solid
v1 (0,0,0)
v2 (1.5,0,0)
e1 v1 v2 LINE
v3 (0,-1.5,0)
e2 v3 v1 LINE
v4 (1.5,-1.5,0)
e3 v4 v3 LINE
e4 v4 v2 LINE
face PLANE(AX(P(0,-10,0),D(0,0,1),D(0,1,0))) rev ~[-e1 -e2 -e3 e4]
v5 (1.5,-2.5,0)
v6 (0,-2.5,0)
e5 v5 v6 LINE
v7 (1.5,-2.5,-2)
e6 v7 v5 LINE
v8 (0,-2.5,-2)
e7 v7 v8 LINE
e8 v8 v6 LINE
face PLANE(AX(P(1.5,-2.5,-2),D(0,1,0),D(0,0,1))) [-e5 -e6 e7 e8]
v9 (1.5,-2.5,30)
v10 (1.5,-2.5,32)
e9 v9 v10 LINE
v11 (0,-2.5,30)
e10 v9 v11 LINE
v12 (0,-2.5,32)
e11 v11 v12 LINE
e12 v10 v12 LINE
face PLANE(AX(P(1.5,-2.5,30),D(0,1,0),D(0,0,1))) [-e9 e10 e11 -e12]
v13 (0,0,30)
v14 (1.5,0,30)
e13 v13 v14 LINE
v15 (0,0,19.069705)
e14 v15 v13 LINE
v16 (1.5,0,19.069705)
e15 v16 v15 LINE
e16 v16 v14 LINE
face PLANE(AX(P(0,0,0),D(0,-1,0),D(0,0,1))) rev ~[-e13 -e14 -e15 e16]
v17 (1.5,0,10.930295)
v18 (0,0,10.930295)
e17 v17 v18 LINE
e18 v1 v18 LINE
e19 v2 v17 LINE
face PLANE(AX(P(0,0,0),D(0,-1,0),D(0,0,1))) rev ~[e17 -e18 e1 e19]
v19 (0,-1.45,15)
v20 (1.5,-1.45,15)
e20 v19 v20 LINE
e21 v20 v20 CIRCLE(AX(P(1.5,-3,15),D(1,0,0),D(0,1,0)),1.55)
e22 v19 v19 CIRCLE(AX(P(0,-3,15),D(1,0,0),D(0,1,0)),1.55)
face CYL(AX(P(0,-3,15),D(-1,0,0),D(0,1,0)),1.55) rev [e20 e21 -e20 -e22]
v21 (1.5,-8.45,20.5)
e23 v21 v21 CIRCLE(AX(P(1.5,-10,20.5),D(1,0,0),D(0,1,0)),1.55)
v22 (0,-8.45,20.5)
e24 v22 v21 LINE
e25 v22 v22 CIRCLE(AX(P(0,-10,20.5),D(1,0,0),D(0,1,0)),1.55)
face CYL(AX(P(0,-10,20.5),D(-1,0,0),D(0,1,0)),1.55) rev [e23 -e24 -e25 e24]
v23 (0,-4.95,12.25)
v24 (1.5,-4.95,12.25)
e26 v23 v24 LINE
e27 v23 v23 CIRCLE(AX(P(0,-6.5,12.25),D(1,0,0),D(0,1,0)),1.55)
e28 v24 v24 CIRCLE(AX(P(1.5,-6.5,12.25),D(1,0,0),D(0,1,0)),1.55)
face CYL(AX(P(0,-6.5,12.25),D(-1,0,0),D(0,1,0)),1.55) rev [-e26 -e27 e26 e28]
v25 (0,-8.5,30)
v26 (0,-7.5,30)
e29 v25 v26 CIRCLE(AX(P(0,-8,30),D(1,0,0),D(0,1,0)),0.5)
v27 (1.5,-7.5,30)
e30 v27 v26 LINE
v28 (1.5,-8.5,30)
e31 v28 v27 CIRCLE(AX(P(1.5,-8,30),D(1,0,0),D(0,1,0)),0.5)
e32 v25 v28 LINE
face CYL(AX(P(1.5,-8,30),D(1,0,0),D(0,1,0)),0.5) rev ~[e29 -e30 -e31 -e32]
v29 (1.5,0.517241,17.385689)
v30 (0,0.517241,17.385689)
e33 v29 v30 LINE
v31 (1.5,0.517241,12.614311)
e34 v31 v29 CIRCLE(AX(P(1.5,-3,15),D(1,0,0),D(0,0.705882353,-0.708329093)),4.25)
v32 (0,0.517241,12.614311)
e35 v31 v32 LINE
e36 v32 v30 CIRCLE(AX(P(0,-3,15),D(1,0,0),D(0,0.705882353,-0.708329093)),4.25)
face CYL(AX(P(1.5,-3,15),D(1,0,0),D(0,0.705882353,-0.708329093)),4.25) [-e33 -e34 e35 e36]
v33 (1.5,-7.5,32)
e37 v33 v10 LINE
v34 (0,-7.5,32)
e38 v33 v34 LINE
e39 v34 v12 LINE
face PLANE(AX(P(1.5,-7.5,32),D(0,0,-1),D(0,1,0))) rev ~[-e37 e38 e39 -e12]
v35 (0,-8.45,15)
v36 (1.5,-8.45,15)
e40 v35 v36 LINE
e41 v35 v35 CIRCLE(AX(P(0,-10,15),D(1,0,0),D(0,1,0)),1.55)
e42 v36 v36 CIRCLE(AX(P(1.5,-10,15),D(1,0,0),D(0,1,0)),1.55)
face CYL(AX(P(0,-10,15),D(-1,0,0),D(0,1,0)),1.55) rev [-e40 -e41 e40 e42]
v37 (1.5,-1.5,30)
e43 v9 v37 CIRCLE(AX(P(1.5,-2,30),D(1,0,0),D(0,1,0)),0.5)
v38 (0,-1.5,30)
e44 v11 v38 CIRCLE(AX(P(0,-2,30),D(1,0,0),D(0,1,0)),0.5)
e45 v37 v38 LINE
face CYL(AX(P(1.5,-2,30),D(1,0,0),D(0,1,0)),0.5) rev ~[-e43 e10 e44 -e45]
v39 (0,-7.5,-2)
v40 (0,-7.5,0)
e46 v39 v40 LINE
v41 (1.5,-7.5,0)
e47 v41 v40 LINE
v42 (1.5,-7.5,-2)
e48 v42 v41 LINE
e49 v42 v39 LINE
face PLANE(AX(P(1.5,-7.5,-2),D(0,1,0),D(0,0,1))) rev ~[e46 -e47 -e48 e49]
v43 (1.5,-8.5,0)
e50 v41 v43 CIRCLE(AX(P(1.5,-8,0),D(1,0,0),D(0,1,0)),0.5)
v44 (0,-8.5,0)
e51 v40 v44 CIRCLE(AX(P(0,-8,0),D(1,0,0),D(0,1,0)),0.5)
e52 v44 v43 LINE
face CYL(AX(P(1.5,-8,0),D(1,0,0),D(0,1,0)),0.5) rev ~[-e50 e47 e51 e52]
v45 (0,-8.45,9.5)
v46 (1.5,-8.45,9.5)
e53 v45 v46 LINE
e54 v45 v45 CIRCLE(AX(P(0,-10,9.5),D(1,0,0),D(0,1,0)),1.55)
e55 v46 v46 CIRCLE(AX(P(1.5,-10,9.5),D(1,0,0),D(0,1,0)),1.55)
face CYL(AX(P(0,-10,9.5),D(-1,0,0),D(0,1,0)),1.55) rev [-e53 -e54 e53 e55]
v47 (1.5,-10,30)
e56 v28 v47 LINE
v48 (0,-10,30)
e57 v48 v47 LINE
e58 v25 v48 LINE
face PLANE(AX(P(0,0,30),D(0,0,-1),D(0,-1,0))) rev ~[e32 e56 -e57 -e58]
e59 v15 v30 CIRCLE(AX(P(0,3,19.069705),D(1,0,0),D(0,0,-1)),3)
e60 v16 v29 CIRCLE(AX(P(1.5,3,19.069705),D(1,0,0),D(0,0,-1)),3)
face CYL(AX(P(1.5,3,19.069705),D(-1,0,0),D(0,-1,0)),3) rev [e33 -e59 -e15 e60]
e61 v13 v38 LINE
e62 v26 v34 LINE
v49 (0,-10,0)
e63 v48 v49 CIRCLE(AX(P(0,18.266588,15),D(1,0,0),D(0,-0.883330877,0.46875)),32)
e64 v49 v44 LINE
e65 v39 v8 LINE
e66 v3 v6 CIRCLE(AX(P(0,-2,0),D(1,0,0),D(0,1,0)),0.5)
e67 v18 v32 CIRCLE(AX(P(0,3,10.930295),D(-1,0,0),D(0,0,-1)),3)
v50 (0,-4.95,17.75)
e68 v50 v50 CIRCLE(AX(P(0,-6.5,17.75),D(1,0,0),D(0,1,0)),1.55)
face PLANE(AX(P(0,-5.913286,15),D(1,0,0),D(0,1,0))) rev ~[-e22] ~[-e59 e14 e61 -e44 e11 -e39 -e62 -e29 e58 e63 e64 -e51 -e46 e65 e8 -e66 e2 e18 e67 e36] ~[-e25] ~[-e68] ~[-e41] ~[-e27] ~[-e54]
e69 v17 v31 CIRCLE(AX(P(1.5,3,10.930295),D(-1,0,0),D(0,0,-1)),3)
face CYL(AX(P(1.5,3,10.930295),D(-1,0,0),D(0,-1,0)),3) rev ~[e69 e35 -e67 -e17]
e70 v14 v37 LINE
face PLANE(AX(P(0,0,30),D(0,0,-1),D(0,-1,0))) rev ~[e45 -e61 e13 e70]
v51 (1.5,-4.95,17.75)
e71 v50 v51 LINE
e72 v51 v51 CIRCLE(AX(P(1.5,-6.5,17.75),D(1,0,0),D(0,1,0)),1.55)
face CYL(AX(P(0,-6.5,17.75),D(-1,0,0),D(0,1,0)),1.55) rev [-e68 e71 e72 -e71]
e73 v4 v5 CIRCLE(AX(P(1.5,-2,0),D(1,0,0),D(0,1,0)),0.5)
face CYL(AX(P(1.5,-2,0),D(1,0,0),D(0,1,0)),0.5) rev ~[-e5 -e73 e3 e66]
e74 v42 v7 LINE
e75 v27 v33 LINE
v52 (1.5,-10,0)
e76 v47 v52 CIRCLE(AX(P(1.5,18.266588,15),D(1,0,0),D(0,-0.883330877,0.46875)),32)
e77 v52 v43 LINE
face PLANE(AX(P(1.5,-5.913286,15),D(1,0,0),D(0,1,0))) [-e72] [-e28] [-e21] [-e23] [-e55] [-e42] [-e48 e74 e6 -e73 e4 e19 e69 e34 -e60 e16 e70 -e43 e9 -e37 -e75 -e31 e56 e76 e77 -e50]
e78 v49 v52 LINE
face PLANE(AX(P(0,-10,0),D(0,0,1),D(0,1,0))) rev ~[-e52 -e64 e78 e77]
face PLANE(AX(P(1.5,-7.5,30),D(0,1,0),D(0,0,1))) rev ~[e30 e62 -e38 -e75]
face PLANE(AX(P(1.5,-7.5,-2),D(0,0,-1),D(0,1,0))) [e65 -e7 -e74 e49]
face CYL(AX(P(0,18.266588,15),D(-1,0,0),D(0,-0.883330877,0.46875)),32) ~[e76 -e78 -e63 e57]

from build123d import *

# Parameters (mm, degrees)
F0_R     = 1.55
F1_DEPTH = 1.5
F2_W     = 5
F2_H     = 2
F3_DEPTH = 1.5
F4_R     = 0.5
F5_DEPTH = 25
F7_DEPTH = 1.5
F8_R     = 3


with BuildPart() as f1:
    # F0 (on Right) → F1 (new body)
    with BuildSketch(Plane.YZ):
        with BuildLine():
            Line((-10, 0), (0, 0))
            Line((0, 0), (0, 30))
            Line((0, 30), (-10, 30))
            ThreePointArc((-10, 30), (-13.7334119498, 15), (-10, 0))
        make_face()
        with Locations((-10, 9.5)):
            Circle(F0_R, mode=Mode.SUBTRACT)
        with Locations((-6.5, 12.25)):
            Circle(F0_R, mode=Mode.SUBTRACT)
        with Locations((-10, 15)):
            Circle(F0_R, mode=Mode.SUBTRACT)
        with Locations((-10, 20.5)):
            Circle(F0_R, mode=Mode.SUBTRACT)
        with Locations((-6.5, 17.75)):
            Circle(F0_R, mode=Mode.SUBTRACT)
        with Locations((-3, 15)):
            Circle(F0_R, mode=Mode.SUBTRACT)
    extrude(amount=F1_DEPTH)

    # F2 (on face) → F3 (join)
    with BuildSketch(Plane.YZ.offset(1.5)):
        with Locations((-5, 31)):
            Rectangle(F2_W, F2_H)
        with Locations((-5, -1)):
            Rectangle(F2_W, F2_H)
    extrude(amount=-F3_DEPTH)

    # F4 (on face) → F5 (cut)
    with BuildSketch(Plane.YZ.offset(1.5)):
        with Locations((-8, 30)):
            Circle(F4_R)
        with Locations((-2, 30)):
            Circle(F4_R)
        with Locations((-2, 0)):
            Circle(F4_R)
        with Locations((-8, 0)):
            Circle(F4_R)
    extrude(amount=-F5_DEPTH, mode=Mode.SUBTRACT)

    # F6 (on face) → F7 (join)
    with BuildSketch(Plane.YZ.offset(1.5)):
        with BuildLine():
            Line((0, 18.0103986447), (0, 11.9896013553))
            ThreePointArc((0, 11.9896013553), (1.25, 15), (0, 18.0103986447))
        make_face()
    extrude(amount=-F7_DEPTH)

    # F8
    f8_edges = [f1.edges().sort_by_distance(p)[0] for p in [
        (0.75, 0, 11.989601),
        (0.75, 0, 18.010399),
    ]]
    fillet(f8_edges, radius=F8_R)


solid = f1.part
